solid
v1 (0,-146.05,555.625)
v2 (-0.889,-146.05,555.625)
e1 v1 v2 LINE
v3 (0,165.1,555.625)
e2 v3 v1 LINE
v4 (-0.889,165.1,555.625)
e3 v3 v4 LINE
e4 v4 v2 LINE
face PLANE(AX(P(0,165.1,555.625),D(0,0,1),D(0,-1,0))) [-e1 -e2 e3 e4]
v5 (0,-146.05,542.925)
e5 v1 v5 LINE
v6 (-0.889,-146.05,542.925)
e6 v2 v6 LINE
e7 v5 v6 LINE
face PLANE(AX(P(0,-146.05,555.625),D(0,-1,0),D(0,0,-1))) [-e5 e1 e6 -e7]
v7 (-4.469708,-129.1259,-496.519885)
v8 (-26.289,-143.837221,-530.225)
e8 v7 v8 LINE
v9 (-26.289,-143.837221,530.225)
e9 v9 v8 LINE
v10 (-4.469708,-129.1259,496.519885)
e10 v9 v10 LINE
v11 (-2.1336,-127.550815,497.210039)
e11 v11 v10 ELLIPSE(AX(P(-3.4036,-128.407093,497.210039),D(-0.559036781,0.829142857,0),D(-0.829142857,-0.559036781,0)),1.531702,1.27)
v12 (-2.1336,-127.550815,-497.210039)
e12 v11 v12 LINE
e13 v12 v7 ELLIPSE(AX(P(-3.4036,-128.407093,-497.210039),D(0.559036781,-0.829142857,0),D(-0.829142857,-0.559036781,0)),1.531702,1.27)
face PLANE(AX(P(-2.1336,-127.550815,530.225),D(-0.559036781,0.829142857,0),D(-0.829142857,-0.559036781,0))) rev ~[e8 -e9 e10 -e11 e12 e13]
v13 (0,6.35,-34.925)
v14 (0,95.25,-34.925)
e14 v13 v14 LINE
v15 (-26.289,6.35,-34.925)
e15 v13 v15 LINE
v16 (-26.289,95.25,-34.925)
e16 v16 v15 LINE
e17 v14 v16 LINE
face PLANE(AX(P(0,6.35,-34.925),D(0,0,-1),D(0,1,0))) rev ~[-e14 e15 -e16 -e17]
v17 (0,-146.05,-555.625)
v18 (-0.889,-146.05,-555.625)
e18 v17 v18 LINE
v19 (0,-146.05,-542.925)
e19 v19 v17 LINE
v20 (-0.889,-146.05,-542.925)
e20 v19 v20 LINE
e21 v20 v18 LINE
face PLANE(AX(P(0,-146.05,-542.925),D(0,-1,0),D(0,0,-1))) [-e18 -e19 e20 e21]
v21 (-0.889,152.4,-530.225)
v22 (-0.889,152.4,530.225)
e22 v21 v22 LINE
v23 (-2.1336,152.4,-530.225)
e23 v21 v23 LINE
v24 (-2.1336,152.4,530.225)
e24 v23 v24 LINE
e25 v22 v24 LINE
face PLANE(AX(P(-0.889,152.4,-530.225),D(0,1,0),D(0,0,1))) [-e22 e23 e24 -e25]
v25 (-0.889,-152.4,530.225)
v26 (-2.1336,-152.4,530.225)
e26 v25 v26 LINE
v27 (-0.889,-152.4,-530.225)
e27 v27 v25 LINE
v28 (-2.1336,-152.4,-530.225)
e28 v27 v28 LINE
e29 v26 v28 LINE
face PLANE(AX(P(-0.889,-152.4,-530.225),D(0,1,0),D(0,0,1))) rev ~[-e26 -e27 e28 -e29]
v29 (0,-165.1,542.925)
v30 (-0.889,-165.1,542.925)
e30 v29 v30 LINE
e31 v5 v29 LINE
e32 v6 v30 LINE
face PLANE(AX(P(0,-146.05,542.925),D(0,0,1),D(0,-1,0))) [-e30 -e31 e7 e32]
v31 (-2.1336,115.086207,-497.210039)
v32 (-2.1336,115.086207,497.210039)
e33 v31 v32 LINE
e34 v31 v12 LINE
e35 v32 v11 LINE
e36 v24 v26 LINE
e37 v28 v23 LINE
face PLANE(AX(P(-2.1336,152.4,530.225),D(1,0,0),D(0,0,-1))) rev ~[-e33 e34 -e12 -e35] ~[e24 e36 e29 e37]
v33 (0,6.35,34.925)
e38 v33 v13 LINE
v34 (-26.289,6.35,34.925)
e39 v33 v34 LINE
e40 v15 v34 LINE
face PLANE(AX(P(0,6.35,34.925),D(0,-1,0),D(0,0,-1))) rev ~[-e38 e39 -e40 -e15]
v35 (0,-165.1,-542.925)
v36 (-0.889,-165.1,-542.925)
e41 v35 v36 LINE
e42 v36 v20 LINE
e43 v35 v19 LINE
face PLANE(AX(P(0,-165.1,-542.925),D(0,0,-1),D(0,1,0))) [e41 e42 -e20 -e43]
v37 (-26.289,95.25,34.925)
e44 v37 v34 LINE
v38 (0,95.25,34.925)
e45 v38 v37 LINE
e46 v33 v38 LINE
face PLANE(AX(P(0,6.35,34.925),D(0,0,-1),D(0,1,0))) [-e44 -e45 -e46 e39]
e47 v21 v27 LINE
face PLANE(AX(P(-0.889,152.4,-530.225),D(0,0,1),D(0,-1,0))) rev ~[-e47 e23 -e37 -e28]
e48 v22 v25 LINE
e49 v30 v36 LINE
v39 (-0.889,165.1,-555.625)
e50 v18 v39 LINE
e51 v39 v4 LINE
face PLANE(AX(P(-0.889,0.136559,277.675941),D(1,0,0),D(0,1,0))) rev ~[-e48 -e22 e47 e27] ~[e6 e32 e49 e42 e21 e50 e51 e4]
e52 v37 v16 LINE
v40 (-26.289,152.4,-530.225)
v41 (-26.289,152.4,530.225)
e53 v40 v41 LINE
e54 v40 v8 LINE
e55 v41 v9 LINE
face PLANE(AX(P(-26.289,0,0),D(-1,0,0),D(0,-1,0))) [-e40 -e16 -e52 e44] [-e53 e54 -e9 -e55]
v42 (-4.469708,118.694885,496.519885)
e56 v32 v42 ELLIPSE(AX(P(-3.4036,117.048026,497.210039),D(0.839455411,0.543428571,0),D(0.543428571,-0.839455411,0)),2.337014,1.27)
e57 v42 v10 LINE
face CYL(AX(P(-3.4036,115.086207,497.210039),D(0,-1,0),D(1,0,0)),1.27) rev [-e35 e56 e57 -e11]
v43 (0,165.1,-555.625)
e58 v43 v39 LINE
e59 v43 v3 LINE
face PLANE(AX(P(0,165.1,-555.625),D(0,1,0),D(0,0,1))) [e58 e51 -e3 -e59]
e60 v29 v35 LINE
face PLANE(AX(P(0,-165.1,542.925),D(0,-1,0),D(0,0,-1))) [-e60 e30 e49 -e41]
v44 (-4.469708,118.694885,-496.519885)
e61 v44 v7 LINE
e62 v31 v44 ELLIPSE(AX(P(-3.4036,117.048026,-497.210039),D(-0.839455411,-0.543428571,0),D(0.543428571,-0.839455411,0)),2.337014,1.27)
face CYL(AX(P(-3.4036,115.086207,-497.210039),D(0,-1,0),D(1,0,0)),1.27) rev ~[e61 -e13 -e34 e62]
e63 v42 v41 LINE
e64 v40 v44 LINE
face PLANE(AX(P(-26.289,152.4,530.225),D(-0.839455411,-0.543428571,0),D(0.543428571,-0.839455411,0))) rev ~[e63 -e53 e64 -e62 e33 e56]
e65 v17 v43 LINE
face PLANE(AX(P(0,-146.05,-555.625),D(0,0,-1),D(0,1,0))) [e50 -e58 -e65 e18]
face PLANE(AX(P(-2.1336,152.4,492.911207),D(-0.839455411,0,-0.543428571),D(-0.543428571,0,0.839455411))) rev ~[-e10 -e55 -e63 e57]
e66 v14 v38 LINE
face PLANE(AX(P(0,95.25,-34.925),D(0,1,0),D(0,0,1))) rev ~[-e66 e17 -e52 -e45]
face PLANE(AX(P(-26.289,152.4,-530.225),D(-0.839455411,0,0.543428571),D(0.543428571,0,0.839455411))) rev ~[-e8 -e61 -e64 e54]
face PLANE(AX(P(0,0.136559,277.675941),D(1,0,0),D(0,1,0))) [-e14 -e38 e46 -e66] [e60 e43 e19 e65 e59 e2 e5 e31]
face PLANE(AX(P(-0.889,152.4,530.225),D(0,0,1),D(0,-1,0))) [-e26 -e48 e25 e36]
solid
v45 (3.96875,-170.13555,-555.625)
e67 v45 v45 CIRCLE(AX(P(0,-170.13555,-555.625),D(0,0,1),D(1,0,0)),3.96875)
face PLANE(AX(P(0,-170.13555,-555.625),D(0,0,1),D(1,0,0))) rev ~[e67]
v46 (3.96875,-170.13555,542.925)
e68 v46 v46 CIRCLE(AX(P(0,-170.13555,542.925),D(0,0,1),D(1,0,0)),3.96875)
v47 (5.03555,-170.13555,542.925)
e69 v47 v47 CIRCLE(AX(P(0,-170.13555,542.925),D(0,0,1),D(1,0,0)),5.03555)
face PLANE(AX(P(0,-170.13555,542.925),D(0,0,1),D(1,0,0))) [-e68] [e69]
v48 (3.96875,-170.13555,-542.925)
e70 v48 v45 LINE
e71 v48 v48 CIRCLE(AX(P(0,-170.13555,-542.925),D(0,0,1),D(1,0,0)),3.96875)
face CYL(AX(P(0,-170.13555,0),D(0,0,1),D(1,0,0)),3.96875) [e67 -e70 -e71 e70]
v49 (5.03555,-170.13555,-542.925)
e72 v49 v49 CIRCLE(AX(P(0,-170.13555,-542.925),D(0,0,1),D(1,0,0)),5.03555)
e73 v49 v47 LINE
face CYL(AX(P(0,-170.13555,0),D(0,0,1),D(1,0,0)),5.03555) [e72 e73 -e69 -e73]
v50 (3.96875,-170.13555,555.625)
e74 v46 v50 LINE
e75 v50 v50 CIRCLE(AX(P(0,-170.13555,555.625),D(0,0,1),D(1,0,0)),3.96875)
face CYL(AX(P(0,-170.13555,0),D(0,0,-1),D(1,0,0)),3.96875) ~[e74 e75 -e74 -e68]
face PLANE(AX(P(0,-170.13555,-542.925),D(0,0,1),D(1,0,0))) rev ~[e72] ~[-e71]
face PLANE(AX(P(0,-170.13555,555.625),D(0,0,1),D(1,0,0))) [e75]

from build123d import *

# Parameters (mm, degrees)
F1_DEPTH       = 0.889
F2_W           = 304.8
F2_H           = 1060.45
F3_DEPTH       = 25.4
F5_DEPTH       = 317.501
F7_DEPTH       = 1085.851
F8_R           = 1.27
F9_W           = 88.9
F9_H           = 34.925
F10_DEPTH      = 26.29
F11_R          = 5.03555
F11_R_2        = 3.96875
F12_DEPTH      = 542.925
F12_DEPTH_BACK = 542.925
F13_R          = 3.96875
F14_DEPTH      = 555.625
F14_DEPTH_BACK = 555.625


# Not quite as in the source:
# - a feature names something its author has since deleted; it is built from what else it names


with BuildPart() as f1:
    # F0 (on Right) → F1 (new body)
    with BuildSketch(Plane.YZ):
        Polygon((165.1, 555.625), (-146.05, 555.625), (-146.05, 542.925), (-165.1, 542.925), (-165.1, 0), (165.1, 0), align=None)
        Polygon((165.1, -555.625), (165.1, 0), (-165.1, 0), (-165.1, -542.925), (-146.05, -542.925), (-146.05, -555.625), align=None)
    extrude(amount=-F1_DEPTH)

    # F2 (on face) → F3 (join)
    with BuildSketch(Plane(origin=(-0.889, 0, 0), x_dir=(0, -1, 0), z_dir=(-1, 0, 0))):
        Rectangle(F2_W, F2_H)
    extrude(amount=F3_DEPTH)

    # F4 (on face) → F5 (cut, through all)
    with BuildSketch(Plane(origin=(0, 152.4, 0), x_dir=(-1, 0, 0), z_dir=(0, 1, 0))):
        Polygon((2.1336, -530.225), (26.289, -530.225), (2.1336, -492.9112069626), align=None)
        Polygon((2.1336, 492.9112069626), (26.289, 530.225), (2.1336, 530.225), align=None)
    extrude(amount=-F5_DEPTH, mode=Mode.SUBTRACT)

    # F6 (on face) → F7 (cut, through all)
    with BuildSketch(Plane.XY.offset(530.225)):
        Polygon((-2.1336, -152.4), (-2.1336, -127.550815087), (-38.989, -152.4), align=None)
        Polygon((-2.1336, 152.4), (-26.289, 152.4), (-2.1336, 115.0862069626), align=None)
    extrude(amount=-F7_DEPTH, mode=Mode.SUBTRACT)

    # F8
    f8_edges = [f1.edges().sort_by_distance(p)[0] for p in [
        (-2.1336, -6.232304, 492.911207),
        (-2.1336, -6.232304, -492.911207),
    ]]
    fillet(f8_edges, radius=F8_R)

    # F9 (on face) → F10 (cut, through all)
    with BuildSketch(Plane.YZ):
        with Locations((50.8, 17.4625)):
            Rectangle(F9_W, F9_H)
        with Locations((50.8, -17.4625)):
            Rectangle(F9_W, F9_H)
    extrude(amount=-F10_DEPTH, mode=Mode.SUBTRACT)


with BuildPart() as f12:
    # F11 (on Top) → F12 (new body, two sides)
    with BuildSketch(Plane.XY) as f12_sk:
        with Locations((0, -170.13555)):
            Circle(F11_R)
        with Locations((0, -170.13555)):
            Circle(F11_R_2, mode=Mode.SUBTRACT)
    extrude(amount=F12_DEPTH)
    extrude(f12_sk.sketch, amount=-F12_DEPTH_BACK)

    # F13 (on Top) → F14 (join, two sides)
    with BuildSketch(Plane.XY) as f14_sk:
        with Locations((0, -170.13555)):
            Circle(F13_R)
    extrude(amount=F14_DEPTH)
    extrude(f14_sk.sketch, amount=-F14_DEPTH_BACK)


solid = Compound([f1.part, f12.part])
